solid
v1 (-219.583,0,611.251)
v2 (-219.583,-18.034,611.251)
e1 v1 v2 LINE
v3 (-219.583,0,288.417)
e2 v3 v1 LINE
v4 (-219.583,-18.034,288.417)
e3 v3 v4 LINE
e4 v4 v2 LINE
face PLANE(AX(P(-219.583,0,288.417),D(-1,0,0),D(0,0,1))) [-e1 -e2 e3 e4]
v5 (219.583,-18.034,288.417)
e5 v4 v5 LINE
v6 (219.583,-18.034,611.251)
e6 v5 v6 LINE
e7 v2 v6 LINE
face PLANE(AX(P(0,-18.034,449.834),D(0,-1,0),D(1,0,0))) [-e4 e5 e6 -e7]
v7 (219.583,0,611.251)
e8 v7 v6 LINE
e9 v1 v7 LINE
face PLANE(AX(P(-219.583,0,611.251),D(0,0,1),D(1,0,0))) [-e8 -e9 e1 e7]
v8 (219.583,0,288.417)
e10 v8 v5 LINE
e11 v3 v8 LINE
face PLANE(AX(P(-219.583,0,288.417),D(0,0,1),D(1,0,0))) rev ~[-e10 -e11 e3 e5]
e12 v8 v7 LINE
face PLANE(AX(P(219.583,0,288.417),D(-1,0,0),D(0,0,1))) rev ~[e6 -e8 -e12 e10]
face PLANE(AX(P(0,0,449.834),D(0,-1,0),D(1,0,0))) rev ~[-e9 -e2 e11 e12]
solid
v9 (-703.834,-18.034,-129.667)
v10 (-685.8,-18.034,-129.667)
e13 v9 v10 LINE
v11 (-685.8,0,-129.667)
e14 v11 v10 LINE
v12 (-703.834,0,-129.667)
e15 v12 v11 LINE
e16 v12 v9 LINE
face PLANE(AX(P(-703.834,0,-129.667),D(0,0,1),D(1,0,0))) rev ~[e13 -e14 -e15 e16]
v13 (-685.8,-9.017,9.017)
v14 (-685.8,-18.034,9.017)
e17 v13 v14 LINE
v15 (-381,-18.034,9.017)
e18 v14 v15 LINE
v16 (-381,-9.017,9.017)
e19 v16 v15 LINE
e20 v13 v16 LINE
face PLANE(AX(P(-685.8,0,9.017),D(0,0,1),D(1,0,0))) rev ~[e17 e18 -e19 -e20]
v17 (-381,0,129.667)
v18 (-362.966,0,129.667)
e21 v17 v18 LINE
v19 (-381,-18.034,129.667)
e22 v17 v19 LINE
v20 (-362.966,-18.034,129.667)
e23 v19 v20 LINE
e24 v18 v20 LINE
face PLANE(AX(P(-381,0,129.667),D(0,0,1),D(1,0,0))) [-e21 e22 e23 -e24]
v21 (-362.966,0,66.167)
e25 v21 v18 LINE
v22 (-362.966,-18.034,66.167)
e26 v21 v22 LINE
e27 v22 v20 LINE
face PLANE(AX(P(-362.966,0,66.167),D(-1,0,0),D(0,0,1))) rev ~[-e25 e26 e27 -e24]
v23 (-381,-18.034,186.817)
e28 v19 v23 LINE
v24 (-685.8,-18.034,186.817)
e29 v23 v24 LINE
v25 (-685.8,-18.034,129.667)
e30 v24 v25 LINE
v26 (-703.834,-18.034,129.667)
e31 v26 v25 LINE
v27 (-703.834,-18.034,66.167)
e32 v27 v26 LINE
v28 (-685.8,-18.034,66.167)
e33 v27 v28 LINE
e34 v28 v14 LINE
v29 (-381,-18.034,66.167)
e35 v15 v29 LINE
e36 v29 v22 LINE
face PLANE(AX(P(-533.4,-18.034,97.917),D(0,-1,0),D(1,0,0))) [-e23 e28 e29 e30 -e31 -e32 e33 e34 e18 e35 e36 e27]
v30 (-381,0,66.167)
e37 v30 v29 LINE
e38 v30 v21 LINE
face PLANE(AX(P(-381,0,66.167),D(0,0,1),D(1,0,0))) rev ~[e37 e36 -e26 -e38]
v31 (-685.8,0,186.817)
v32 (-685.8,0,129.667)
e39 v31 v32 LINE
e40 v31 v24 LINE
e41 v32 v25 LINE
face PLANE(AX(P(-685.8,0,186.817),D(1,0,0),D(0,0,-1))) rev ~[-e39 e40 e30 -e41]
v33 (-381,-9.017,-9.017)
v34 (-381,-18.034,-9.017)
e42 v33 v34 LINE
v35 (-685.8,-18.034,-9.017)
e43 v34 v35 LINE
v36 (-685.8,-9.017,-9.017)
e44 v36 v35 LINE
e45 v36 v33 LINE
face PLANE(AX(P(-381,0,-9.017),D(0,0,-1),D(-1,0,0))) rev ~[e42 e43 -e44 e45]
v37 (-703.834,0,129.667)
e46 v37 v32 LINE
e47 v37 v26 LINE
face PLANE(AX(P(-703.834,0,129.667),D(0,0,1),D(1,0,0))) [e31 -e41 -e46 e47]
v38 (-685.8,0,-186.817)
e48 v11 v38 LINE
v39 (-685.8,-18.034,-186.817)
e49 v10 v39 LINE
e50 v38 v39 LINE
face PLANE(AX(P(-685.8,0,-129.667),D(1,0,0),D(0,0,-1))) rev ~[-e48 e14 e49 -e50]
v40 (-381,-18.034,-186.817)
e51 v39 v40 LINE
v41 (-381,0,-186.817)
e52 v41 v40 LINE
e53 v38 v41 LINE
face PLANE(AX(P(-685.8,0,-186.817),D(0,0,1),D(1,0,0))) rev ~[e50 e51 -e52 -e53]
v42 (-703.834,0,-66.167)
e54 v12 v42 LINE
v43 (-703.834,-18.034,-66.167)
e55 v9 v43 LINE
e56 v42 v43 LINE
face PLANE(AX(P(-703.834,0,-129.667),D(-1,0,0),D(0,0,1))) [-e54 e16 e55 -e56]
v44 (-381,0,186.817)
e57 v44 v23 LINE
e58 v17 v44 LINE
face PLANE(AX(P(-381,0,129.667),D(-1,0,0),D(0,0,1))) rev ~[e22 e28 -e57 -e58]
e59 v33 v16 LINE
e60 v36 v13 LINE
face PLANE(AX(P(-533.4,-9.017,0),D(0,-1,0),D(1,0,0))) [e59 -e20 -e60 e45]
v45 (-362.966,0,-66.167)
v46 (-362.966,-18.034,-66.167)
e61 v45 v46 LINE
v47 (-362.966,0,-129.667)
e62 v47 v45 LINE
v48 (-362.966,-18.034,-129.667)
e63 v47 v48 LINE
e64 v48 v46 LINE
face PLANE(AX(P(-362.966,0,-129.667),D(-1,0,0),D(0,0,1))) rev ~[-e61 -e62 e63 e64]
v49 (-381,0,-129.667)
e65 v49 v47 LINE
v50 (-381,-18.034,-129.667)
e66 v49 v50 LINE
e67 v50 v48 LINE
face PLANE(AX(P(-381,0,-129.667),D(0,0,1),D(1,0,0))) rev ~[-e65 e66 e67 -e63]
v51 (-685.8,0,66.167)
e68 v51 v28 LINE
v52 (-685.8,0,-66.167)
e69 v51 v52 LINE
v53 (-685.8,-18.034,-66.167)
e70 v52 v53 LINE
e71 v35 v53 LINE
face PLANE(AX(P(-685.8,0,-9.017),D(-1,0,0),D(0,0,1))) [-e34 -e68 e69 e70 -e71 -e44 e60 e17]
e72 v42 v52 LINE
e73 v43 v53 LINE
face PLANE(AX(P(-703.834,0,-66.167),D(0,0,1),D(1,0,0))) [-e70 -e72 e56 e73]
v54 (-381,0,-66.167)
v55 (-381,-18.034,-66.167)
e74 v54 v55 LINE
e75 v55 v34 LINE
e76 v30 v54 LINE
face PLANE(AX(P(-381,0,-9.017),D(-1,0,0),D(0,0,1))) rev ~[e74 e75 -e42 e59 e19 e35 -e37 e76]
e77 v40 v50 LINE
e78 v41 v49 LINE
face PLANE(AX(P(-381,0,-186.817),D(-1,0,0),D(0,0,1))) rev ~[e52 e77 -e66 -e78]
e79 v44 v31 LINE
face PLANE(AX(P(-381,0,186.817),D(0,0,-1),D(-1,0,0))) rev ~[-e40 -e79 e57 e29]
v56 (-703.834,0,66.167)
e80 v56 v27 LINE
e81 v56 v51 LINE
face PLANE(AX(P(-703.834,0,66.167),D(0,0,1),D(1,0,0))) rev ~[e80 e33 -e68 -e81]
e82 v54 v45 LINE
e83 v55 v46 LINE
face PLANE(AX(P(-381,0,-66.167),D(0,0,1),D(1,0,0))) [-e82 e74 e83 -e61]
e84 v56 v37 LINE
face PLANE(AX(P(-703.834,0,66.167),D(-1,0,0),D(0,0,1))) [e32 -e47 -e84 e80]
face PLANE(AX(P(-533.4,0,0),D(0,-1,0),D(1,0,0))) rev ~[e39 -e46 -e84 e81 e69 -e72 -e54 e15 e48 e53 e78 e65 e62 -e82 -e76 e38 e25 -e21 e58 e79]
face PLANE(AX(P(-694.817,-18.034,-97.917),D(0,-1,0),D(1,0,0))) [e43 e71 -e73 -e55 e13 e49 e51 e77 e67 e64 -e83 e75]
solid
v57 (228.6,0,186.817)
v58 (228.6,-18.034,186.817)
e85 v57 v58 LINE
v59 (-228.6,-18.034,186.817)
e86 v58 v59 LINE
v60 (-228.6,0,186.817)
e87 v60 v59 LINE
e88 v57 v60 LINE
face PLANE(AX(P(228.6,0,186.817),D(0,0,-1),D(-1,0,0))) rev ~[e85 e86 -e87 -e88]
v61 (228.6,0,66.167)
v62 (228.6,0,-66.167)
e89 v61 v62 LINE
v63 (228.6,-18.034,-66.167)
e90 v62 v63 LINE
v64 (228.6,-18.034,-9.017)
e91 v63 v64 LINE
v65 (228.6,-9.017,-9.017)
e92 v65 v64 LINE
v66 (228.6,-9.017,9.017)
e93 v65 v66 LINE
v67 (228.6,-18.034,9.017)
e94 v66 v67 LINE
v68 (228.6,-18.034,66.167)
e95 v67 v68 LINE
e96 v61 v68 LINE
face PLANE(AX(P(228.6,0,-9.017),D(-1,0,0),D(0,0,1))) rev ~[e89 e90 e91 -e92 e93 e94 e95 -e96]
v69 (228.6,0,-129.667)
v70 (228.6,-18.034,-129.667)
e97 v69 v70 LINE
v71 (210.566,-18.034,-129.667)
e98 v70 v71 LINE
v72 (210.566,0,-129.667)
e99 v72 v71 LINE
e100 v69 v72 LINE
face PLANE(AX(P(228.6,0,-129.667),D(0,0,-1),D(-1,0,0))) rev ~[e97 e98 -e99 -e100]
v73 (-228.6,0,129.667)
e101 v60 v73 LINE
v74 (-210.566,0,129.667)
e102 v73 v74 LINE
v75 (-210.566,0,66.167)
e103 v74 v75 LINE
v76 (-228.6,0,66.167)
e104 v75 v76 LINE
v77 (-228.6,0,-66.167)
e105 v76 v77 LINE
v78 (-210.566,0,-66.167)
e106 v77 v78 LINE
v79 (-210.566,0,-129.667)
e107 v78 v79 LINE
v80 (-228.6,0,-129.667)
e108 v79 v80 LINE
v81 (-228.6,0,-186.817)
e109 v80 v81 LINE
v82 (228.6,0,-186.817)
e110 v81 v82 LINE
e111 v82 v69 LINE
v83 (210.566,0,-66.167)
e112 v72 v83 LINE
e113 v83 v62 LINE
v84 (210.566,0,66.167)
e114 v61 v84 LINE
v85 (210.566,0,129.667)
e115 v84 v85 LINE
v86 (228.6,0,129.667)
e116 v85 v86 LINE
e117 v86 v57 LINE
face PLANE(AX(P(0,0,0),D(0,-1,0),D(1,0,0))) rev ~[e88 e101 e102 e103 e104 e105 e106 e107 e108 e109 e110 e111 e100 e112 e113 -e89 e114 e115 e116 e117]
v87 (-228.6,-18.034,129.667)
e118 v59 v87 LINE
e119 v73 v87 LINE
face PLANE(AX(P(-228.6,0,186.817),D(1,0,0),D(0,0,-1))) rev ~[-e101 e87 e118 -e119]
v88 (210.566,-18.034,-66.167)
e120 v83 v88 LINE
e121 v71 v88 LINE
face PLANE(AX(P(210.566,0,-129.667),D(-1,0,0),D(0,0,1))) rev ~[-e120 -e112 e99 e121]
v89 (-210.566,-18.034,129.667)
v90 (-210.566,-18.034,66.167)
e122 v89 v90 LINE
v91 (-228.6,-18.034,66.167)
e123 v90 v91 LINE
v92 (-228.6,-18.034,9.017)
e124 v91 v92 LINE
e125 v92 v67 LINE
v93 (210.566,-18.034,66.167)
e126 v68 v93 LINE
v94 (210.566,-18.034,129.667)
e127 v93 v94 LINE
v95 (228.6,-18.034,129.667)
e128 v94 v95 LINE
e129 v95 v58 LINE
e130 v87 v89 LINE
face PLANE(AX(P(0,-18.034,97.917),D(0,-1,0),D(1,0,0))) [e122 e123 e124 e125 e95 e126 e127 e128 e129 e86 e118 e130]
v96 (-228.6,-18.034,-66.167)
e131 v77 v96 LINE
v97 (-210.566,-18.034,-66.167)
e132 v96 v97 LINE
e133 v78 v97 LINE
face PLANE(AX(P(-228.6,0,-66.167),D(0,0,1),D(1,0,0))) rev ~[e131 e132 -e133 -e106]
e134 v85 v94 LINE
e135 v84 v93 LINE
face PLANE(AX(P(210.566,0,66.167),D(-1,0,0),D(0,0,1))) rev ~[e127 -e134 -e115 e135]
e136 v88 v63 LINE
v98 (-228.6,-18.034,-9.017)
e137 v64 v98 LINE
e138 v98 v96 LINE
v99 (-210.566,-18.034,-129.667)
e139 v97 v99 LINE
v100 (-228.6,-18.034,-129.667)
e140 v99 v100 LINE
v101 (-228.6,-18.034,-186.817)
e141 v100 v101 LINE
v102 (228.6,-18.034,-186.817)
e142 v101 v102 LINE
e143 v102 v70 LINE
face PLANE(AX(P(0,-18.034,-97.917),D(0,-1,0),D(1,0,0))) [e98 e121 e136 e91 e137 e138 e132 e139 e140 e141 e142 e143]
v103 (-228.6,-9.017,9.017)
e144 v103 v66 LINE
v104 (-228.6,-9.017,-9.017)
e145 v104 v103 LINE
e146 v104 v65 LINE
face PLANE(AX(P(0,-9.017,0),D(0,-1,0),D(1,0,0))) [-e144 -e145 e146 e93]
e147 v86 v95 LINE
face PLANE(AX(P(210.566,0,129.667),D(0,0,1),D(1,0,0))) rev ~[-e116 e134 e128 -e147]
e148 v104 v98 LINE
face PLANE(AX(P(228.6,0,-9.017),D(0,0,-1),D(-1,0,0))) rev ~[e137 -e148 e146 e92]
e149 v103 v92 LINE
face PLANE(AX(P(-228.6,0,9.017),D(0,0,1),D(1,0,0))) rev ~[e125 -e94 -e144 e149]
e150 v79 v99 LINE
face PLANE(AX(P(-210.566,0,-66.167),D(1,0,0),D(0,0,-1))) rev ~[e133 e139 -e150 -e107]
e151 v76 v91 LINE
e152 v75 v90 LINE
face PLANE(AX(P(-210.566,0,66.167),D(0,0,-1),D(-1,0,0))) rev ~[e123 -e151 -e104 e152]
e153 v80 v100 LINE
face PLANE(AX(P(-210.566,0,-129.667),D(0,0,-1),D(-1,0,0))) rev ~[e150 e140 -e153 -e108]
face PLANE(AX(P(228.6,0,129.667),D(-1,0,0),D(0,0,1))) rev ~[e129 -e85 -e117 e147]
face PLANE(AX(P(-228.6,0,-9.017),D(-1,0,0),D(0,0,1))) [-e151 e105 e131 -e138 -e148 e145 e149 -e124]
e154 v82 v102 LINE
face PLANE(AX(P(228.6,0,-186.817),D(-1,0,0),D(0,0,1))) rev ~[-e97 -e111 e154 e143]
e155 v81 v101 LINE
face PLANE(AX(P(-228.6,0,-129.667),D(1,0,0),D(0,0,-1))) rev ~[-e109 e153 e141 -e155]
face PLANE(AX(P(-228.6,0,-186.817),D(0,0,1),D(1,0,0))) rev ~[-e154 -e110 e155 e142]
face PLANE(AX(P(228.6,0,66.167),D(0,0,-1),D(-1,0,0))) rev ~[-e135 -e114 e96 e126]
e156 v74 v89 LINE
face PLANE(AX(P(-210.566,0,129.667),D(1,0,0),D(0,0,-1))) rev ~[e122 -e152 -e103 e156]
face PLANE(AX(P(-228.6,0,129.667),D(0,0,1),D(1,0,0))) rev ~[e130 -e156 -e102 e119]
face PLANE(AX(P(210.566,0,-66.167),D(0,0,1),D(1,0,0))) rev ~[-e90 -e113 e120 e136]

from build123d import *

# Parameters (mm, degrees)
F1_W     = 18.034
F1_H     = 63.5
F2_DEPTH = 18.034
F1_W_2   = 439.166
F1_H_2   = 322.834
F1_W_3   = 304.8
F1_H_3   = 18.034
F3_DEPTH = 9.017
F1_W_4   = 457.2


# Not quite as in the source:
# - a variable given as a bare number and used for a length is read in inches; the dataset says mm whatever the document's units were
# - a feature names something its author has since deleted; it is built from what else it names


with BuildPart() as f2:
    # F1 (on Front) → F2 (new body)
    with BuildSketch(Plane.XZ):
        Polygon((-381, 129.667), (-381, 186.817), (-685.8, 186.817), (-685.8, 129.667), (-685.8, 66.167), (-685.8, 9.017), (-381, 9.017), (-381, 66.167), align=None)
        with Locations((-694.817, 97.917)):
            Rectangle(F1_W, F1_H)
        with Locations((-371.983, 97.917)):
            Rectangle(F1_W, F1_H)
    extrude(amount=F2_DEPTH)



with BuildPart() as f2b:
    # F1 (on Front) → F2, piece 2 (new body)
    with BuildSketch(Plane.XZ):
        with Locations((-694.817, -97.917)):
            Rectangle(F1_W, F1_H)
        with Locations((-371.983, -97.917)):
            Rectangle(F1_W, F1_H)
        Polygon((-381, -66.167), (-381, -9.017), (-685.8, -9.017), (-685.8, -66.167), (-685.8, -129.667), (-685.8, -186.817), (-381, -186.817), (-381, -129.667), align=None)
    extrude(amount=F2_DEPTH)


with BuildPart() as f2c:
    # F1 (on Front) → F2, piece 3 (new body)
    with BuildSketch(Plane.XZ):
        Polygon((228.6, -9.017), (-228.6, -9.017), (-228.6, -66.167), (-210.566, -66.167), (-210.566, -129.667), (-228.6, -129.667), (-228.6, -186.817), (228.6, -186.817), (228.6, -129.667), (210.566, -129.667), (210.566, -66.167), (228.6, -66.167), align=None)
    extrude(amount=F2_DEPTH)



with BuildPart() as f2d:
    # F1 (on Front) → F2, piece 4 (new body)
    with BuildSketch(Plane.XZ):
        Polygon((228.6, 186.817), (-228.6, 186.817), (-228.6, 129.667), (-210.566, 129.667), (-210.566, 66.167), (-228.6, 66.167), (-228.6, 9.017), (228.6, 9.017), (228.6, 66.167), (210.566, 66.167), (210.566, 129.667), (228.6, 129.667), align=None)
    extrude(amount=F2_DEPTH)


with BuildPart() as f2e:
    # F1 (on Front) → F2, piece 5 (new body)
    with BuildSketch(Plane.XZ):
        with Locations((0, 449.834)):
            Rectangle(F1_W_2, F1_H_2)
    extrude(amount=F2_DEPTH)


with BuildPart() as f2_1:
    add(f2.part)

    add(f2b.part)  # F3 merges F2b
    # F1 (on Front) → F3 (join)
    with BuildSketch(Plane.XZ):
        with Locations((-533.4, 0)):
            Rectangle(F1_W_3, F1_H_3)
    extrude(amount=F3_DEPTH)


with BuildPart() as f2c_1:
    add(f2c.part)

    add(f2d.part)  # F3#2 merges F2d
    # F1 (on Front) → F3, piece 2 (join)
    with BuildSketch(Plane.XZ):
        Rectangle(F1_W_4, F1_H_3)
    extrude(amount=F3_DEPTH)


solid = Compound([f2e.part, f2_1.part, f2c_1.part])
